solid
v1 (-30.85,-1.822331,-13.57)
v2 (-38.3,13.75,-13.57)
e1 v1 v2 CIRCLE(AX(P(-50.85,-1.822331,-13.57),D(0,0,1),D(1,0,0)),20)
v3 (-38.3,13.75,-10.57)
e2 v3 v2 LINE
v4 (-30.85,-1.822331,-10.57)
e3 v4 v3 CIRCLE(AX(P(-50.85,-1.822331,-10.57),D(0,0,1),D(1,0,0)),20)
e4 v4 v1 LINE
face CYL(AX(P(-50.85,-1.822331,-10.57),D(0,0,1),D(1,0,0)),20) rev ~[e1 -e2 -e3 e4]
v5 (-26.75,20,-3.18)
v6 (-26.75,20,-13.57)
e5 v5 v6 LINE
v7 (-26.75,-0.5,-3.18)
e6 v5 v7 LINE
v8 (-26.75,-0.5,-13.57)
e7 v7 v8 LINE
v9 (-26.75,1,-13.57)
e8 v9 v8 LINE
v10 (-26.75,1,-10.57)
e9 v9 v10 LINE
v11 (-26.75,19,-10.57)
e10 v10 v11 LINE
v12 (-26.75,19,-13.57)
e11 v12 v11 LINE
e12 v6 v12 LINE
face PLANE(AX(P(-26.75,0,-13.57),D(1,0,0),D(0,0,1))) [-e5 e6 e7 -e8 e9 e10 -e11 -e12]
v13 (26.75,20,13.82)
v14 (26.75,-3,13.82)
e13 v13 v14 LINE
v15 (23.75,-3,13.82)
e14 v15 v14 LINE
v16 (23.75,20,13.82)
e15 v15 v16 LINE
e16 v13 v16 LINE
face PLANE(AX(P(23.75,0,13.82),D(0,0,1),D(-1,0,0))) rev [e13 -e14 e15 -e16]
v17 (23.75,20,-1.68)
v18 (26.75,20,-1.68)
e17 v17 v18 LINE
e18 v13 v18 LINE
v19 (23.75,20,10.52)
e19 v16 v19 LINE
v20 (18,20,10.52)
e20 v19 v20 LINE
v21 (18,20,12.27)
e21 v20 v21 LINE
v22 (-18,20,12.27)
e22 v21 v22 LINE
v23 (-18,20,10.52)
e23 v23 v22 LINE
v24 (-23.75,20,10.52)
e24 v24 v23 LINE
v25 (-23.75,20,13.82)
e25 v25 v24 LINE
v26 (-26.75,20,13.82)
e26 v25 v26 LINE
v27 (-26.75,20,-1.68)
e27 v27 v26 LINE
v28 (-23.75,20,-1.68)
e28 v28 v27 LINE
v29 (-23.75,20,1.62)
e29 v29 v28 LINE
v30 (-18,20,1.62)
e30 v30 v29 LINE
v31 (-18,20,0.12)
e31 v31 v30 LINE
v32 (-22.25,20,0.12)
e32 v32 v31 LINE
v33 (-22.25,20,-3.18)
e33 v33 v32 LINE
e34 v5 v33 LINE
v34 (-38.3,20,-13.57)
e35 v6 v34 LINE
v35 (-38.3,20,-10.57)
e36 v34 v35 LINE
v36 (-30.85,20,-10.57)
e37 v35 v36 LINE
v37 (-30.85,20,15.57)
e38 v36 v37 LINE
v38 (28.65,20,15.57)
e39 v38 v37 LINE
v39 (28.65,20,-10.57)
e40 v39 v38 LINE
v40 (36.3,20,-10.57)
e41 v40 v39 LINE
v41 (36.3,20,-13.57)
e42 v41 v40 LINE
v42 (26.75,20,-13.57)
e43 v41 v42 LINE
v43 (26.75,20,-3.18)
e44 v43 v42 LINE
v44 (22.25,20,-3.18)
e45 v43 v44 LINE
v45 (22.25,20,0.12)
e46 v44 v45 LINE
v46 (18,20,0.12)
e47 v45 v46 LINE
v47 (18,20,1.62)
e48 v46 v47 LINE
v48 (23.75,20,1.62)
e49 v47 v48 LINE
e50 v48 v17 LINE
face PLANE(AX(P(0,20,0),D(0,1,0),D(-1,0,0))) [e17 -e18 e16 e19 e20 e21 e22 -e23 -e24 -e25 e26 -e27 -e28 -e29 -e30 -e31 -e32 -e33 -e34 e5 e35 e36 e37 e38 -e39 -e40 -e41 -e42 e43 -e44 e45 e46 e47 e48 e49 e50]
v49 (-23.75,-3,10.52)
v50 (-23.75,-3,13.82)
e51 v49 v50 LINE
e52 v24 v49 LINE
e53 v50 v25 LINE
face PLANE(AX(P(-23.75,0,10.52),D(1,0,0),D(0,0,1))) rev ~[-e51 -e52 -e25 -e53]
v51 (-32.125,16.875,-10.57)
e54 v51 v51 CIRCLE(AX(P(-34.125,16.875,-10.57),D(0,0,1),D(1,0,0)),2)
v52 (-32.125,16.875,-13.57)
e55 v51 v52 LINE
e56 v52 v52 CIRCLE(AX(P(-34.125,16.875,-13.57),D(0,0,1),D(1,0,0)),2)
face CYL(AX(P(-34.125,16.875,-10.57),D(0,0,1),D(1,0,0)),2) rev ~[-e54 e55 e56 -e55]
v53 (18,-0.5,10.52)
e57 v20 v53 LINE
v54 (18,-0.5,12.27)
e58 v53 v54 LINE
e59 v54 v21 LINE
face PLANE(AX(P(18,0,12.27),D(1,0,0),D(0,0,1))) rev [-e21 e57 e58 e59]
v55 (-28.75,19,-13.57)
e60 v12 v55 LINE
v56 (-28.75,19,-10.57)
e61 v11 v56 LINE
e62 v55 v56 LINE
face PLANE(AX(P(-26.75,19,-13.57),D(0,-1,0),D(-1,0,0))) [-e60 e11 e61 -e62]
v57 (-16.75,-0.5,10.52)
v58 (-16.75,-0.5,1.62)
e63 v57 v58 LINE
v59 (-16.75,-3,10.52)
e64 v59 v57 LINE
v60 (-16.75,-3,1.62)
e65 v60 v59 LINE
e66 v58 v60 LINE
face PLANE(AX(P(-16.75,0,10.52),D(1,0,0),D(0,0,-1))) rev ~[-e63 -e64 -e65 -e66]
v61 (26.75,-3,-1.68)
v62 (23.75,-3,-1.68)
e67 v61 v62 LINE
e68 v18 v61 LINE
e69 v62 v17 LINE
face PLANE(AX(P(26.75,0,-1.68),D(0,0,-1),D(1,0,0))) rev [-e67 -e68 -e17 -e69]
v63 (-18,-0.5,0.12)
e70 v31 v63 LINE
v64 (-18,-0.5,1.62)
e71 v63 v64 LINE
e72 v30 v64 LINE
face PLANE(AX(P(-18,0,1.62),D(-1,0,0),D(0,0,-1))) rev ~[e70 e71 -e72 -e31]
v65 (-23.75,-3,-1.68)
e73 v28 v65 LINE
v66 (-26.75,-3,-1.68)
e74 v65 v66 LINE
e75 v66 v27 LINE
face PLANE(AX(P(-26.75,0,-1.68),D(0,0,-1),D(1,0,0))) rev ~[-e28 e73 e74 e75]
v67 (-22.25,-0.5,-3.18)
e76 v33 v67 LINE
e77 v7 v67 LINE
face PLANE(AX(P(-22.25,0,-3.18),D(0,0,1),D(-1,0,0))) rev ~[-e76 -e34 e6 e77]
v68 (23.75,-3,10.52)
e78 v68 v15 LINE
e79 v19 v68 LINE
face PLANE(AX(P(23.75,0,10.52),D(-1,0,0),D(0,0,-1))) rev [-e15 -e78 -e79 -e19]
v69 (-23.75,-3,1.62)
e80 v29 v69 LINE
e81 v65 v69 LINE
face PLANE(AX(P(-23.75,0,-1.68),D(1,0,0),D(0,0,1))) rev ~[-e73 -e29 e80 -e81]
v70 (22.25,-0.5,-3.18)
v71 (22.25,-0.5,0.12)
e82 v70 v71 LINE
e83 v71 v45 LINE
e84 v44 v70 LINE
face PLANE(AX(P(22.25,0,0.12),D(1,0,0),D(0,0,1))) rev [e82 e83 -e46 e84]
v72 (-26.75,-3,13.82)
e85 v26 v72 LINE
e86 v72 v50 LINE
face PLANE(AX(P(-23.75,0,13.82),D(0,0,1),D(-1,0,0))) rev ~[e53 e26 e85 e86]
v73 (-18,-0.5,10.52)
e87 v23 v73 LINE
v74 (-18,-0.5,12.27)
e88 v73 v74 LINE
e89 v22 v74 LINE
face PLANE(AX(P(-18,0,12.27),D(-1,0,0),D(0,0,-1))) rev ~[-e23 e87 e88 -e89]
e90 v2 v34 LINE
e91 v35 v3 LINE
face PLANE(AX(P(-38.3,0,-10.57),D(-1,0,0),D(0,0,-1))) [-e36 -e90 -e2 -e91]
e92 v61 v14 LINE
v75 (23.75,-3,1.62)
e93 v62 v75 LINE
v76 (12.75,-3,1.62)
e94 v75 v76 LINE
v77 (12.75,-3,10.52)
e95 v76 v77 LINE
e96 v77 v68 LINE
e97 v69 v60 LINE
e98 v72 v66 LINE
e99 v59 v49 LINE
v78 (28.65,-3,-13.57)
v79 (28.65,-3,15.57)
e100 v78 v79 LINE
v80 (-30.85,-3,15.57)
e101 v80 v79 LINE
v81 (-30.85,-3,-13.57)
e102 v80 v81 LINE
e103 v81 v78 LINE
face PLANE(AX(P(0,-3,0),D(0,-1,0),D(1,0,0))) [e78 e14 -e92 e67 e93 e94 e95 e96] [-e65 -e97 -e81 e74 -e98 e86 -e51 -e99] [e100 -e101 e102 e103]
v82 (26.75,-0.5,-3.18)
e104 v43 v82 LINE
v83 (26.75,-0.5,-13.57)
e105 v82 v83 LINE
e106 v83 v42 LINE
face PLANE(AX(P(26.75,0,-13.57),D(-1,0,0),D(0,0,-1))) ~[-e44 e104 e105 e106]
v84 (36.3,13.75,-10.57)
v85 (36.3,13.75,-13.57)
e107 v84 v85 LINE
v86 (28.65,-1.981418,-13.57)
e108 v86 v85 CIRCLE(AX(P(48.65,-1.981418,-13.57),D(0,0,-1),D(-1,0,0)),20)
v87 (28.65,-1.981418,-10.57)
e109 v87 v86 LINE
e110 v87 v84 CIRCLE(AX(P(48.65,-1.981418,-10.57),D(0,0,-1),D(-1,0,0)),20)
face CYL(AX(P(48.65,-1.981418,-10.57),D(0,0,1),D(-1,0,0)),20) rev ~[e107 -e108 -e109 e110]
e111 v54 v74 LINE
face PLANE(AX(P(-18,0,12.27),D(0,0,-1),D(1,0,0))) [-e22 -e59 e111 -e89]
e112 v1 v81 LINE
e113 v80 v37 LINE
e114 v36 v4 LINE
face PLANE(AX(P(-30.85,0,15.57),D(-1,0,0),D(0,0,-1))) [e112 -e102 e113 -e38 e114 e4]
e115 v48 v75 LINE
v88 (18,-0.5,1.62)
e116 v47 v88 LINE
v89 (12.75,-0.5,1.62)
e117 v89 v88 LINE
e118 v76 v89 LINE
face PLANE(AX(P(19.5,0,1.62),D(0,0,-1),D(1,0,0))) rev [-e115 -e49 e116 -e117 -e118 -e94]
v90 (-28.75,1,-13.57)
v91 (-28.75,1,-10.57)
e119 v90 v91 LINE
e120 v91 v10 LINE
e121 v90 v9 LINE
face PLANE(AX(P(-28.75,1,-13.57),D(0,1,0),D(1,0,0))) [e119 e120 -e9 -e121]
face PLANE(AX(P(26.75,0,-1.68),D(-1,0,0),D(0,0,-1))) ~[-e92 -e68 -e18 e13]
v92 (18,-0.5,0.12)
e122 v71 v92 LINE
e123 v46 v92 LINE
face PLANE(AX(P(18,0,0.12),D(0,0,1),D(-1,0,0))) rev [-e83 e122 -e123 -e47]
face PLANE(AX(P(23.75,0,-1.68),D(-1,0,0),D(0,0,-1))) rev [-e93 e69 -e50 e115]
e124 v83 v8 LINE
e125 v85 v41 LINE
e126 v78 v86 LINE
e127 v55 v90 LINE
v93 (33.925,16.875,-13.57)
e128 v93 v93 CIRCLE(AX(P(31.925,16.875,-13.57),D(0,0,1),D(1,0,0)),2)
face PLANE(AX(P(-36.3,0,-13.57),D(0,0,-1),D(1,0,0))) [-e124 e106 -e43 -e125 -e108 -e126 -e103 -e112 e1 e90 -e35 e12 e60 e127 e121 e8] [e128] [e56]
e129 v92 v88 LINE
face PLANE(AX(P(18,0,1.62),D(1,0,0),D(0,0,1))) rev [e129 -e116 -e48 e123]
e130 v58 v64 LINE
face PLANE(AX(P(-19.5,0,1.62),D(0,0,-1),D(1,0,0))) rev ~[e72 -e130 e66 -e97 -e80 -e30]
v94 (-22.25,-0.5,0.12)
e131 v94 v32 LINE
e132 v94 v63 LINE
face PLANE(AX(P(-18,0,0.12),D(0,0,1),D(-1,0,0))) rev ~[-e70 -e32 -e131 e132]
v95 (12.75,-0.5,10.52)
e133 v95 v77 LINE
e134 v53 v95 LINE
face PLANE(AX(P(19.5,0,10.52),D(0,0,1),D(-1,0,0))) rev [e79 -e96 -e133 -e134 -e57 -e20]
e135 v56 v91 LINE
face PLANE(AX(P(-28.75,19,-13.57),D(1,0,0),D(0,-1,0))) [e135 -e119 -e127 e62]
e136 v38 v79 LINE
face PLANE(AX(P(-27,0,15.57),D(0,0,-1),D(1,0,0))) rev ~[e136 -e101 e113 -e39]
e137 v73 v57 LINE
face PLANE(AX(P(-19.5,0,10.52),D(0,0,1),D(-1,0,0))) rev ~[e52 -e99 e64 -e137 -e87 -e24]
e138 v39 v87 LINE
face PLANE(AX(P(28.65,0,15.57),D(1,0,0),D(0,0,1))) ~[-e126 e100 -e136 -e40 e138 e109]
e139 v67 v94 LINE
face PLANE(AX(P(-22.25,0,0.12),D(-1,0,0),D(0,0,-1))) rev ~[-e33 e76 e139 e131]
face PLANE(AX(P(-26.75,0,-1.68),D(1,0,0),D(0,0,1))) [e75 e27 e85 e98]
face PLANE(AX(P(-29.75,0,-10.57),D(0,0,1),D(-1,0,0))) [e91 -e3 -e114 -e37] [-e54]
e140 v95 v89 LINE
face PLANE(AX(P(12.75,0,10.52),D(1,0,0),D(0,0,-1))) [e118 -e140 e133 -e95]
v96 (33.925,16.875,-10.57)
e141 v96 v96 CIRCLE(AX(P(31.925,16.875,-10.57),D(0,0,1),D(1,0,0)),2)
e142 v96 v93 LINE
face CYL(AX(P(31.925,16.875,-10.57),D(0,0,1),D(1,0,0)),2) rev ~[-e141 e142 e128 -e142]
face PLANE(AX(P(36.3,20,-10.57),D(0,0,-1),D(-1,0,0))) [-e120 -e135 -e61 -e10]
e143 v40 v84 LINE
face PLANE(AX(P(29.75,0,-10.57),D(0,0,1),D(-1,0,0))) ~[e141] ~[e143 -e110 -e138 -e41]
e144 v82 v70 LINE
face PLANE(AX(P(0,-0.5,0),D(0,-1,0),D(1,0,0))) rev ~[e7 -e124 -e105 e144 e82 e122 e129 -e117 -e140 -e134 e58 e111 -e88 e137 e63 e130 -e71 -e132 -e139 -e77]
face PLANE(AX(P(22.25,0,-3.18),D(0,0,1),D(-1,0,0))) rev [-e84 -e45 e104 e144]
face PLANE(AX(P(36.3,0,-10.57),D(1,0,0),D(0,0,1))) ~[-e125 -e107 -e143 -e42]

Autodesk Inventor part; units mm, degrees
ref_plane "YZ Plane" through (0, 0, 0) normal (1, 0, 0) x (0, 1, 0)
ref_plane "XZ Plane" through (0, 0, 0) normal (0, 1, 0) x (-1, 0, 0)
ref_plane "XY Plane" through (0, 0, 0) normal (0, 0, 1) x (1, 0, 0)
sketch "Boceto1" plane through (0, 0, 0) normal (0, 1, 0) x (-1, 0, 0)
  line L0 (24, 13.57) -> (26.5, 13.57)
  line L1 (-26.5, 13.57) -> (26.5, -13.57) construction
  line L2 (26.5, 13.57) -> (-26.5, -13.57) construction
  line L3 (24, 13.57) -> (24, 10.27) construction
  line L4 (24, 10.27) -> (20, 10.27) construction
  line L5 (20, 10.27) -> (20, 1.87) construction
  line L6 (20, 1.87) -> (24, 1.87) construction
  line L7 (24, 1.87) -> (24, -1.43) construction
  line L8 (24, -1.43) -> (26.5, -1.43) construction
  line L9 (26.75, -1.68) -> (23.75, -1.68)
  line L10 (23.75, -1.68) -> (23.75, 1.62)
  line L11 (23.75, 1.62) -> (19.5, 1.62)
  line L12 (19.5, 10.52) -> (23.75, 10.52)
  line L13 (23.75, 10.52) -> (23.75, 13.82)
  line L14 (27, 15.57) -> (0, 15.57)
  line L15 (18, 0.12) -> (22.25, 0.12)
  line L16 (22.25, 0.12) -> (22.25, -3.18)
  line L17 (22.25, -3.18) -> (26.75, -3.18)
  line L18 (18, 12.27) -> (0, 12.27)
  line L19 (19.5, 10.52) -> (18, 10.52)
  line L20 (19.5, 1.62) -> (18, 1.62)
  line L21 (27, 15.57) -> (29.75, 15.57)
  line L22 (29.75, 15.57) -> (29.75, -10.57)
  line L23 (29.75, -10.57) -> (36.3, -10.57)
  line L24 (36.3, -10.57) -> (36.3, -13.57)
  line L25 (36.3, -13.57) -> (26.75, -13.57)
  line L26 (0, 12.27) -> (0, 15.57)
  line L27 (23.75, 13.82) -> (26.75, 13.82)
  line L28 (18, 12.27) -> (18, 10.52)
  line L29 (18, 1.62) -> (18, 0.12)
  line L30 (26.75, -13.57) -> (26.75, -3.18)
  line L31 (26.75, -1.68) -> (26.75, 13.82)
  line L32 (26.5, 13.57) -> (26.5, -1.68) construction
  point P0 (0, 0)
  point P1 (23.75, 13.57)
  point P2 (0, 13.57)
  point P3 (27, -12.07)
  dimension "d1" = 27.14
  dimension "d2" = 15
  dimension "d4" = 3.3
  dimension "d5" = 4
  dimension "d6" = 3.3
  dimension "d10" = 0.25
  dimension "d11" = 0.25
  dimension "d12" = 1.5
  dimension "d16" = 3
  dimension "d17" = 29.14
  dimension "d23" = 18
  dimension "d24" = 2
  dimension "d25" = 0.25
  dimension "d27" = 15.57
  dimension "d28" = 29.75
  dimension "d29" = 3.3
  dimension "d30" = 0.25
  dimension "d31" = 20
  dimension "d32" = 6.5
  dimension "d33" = 0.25
  dimension "d34" = 4.25
  dimension "d36" = 0.25
  dimension "d51" = 36.3
extrude "Extrusión1" add sketch "Boceto1" along normal blind 20
mirror "Simetría1" about plane through (0, 0, 0) normal (1, 0, 0) of "Extrusión1"
sketch "Boceto2" plane through (0, 0, 0) normal (0, -1, 0) x (1, 0, 0)
  line L0 (18, 1.62) -> (18, 0.12) projected
  line L1 (18, 1.62) -> (-18, 1.62)
  line L2 (-18, 1.62) -> (-18, 0.12) projected
  line L3 (-18, 0.12) -> (-22.25, 0.12) projected
  line L4 (-22.25, 0.12) -> (-22.25, -3.18) projected
  line L5 (-22.25, -3.18) -> (-26.75, -3.18) projected
  line L6 (-26.75, -3.18) -> (-26.75, -13.57) projected
  line L7 (26.75, -3.18) -> (26.75, -13.57) projected
  line L8 (22.25, -3.18) -> (26.75, -3.18) projected
  line L9 (22.25, 0.12) -> (22.25, -3.18) projected
  line L10 (18, 0.12) -> (22.25, 0.12) projected
  line L11 (26.75, -13.57) -> (36.3, -13.57) projected
  line L12 (36.3, -13.57) -> (36.3, -10.57) projected
  line L13 (-36.3, -10.57) -> (-29.75, -10.57) projected
  line L14 (-36.3, -13.57) -> (-36.3, -10.57) projected
  line L15 (-26.75, -13.57) -> (-36.3, -13.57) projected
  line L16 (23.75, 1.62) -> (18, 1.62) projected
  line L17 (23.75, -1.68) -> (23.75, 1.62) projected
  line L18 (26.75, -1.68) -> (23.75, -1.68) projected
  line L19 (36.3, -10.57) -> (29.75, -10.57) projected
  line L20 (26.75, -1.68) -> (29.75, -1.68)
  line L21 (29.75, -10.57) -> (29.75, 15.57) projected
  line L22 (-23.75, 1.62) -> (-18, 1.62) projected
  line L23 (-23.75, -1.68) -> (-23.75, 1.62) projected
  line L24 (-26.75, -1.68) -> (-23.75, -1.68) projected
  line L25 (-26.75, 13.82) -> (-26.75, -1.68) projected
  line L26 (-26.75, -1.68) -> (-29.75, -1.68)
  line L27 (-29.75, -10.57) -> (-29.75, 15.57) projected
  line L28 (26.75, -13.57) -> (-26.75, -13.57)
  line L29 (-18, 12.27) -> (18, 12.27) projected
  line L30 (12.75, 12.27) -> (12.75, 1.62)
  line L31 (26.75, 13.82) -> (26.75, -1.68) projected
  line L32 (-29.75, 15.57) -> (29.75, 15.57) projected
  line L33 (-16.75, 12.27) -> (-16.75, 1.62)
  line L34 (23.75, 13.82) -> (26.75, 13.82) projected
  line L35 (18, 10.52) -> (23.75, 10.52) projected
  line L36 (23.75, 10.52) -> (23.75, 13.82) projected
  line L37 (18, 12.27) -> (18, 10.52) projected
  line L38 (-23.75, 10.52) -> (-23.75, 13.82) projected
  line L39 (-18, 10.52) -> (-23.75, 10.52) projected
  line L40 (-18, 12.27) -> (-18, 10.52) projected
  line L41 (-18, 12.27) -> (18, 12.27) projected
  line L42 (18, 12.27) -> (18, 10.52) projected
  line L43 (18, 10.52) -> (23.75, 10.52) projected
  line L44 (23.75, 10.52) -> (23.75, 13.82) projected
  line L45 (23.75, 13.82) -> (26.75, 13.82) projected
  line L46 (26.75, 13.82) -> (26.75, -1.68) projected
  line L47 (26.75, -1.68) -> (23.75, -1.68) projected
  line L48 (23.75, -1.68) -> (23.75, 1.62) projected
  line L49 (23.75, 1.62) -> (18, 1.62) projected
  line L50 (18, 1.62) -> (18, 0.12) projected
  line L51 (18, 0.12) -> (22.25, 0.12) projected
  line L52 (22.25, 0.12) -> (22.25, -3.18) projected
  line L53 (22.25, -3.18) -> (26.75, -3.18) projected
  line L54 (26.75, -3.18) -> (26.75, -13.57) projected
  line L55 (26.75, -13.57) -> (36.3, -13.57) projected
  line L56 (36.3, -13.57) -> (36.3, -10.57) projected
  line L57 (36.3, -10.57) -> (29.75, -10.57) projected
  line L58 (29.75, -10.57) -> (29.75, 15.57) projected
  line L59 (-29.75, 15.57) -> (29.75, 15.57) projected
  line L60 (-29.75, -10.57) -> (-29.75, 15.57) projected
  line L61 (-36.3, -10.57) -> (-29.75, -10.57) projected
  line L62 (-36.3, -13.57) -> (-36.3, -10.57) projected
  line L63 (-26.75, -13.57) -> (-36.3, -13.57) projected
  line L64 (-26.75, -3.18) -> (-26.75, -13.57) projected
  line L65 (-22.25, -3.18) -> (-26.75, -3.18) projected
  line L66 (-22.25, 0.12) -> (-22.25, -3.18) projected
  line L67 (-18, 0.12) -> (-22.25, 0.12) projected
  line L68 (-18, 1.62) -> (-18, 0.12) projected
  line L69 (-23.75, 1.62) -> (-18, 1.62) projected
  line L70 (-23.75, -1.68) -> (-23.75, 1.62) projected
  line L71 (-26.75, -1.68) -> (-23.75, -1.68) projected
  line L72 (-26.75, 13.82) -> (-26.75, -1.68) projected
  line L73 (-23.75, 13.82) -> (-26.75, 13.82) projected
  line L74 (18, 10.52) -> (12.75, 10.52)
  line L75 (-18, 10.52) -> (-16.75, 10.52)
  point P0 (0, 0)
  point P1 (0, 1.62)
  point P2 (12.75, 12.27)
  dimension "d42" = 14
  dimension "d43" = 10
extrude "Extrusión2" add sketch "Boceto2" along normal blind 3 contours L16 L17 L18 L20 L21 L19 L12 L11 L7 L8 L9 L10 L0 | L0 L10 L9 L8 L7 L28 L6 L5 L4 L3 L2 L1 | L1 L33 L29 L30 | L30 L29 L37 L74 | L2 L3 L4 L5 L6 L15 L14 L13 L27 L26 L24 L23 L22 | L75 L40 L29 L33 | L29 L40 L39 L38 L73 L25 L26 L27 L32 L21 L20 L31 L34 L36 L35 L37
move faces "Desplazar2" translate (0, -0.5, 0) faces at (4.25, 0, -8.5067)
move faces "Desplazar3" translate (-1.1, 0, 0) faces at (-29.75, 12.3333, 6.8567)
move faces "Desplazar4" translate (-1.1, 0, 0) faces at (29.75, 12.3333, 6.8567)
move faces "Desplazar5" translate (-2, 0, 0) faces at (-36.3, 12.3333, -11.57)
sketch "Boceto5" plane through (-36.3, -3, -10.57) normal (0, 0, 1) x (1, 0, 0)
  line L0 (0, 0) -> (72.6, 0) projected
  line L1 (5.45, 0) -> (5.45, 23) projected
  line L2 (0, 0) -> (5.45, 0)
  line L3 (5.45, 0) -> (5.45, 16.75)
  line L4 (5.45, 16.75) -> (-2, 16.75)
  line L5 (-2, 16.75) -> (-2, 0)
  line L6 (64.95, 23) -> (64.95, 0) projected
  line L7 (64.95, 0) -> (72.6, 0)
  line L8 (72.6, 0) -> (72.6, 16.75)
  line L9 (72.6, 16.75) -> (64.95, 16.75)
  line L10 (64.95, 16.75) -> (64.95, 0)
  line L11 (72.6, 23) -> (64.95, 23) projected
  line L12 (5.45, 0) -> (-2, 0) projected
  point P0 (36.3, 3)
  dimension "d63" = 6.25
extrude "Extrusión5" cut sketch "Boceto5" against normal blind 10
fillet "Empalme2" radius 20 2 edges at (28.65, 13.75, -12.07) (-30.85, 13.75, -12.07)
sketch "Boceto7" plane through (36.3, 20, -13.57) normal (0, 0, -1) x (-1, 0, 0)
  line L0 (65.05, -19) -> (63.05, -19)
  line L1 (63.05, -19) -> (63.05, -1)
  line L2 (63.05, -1) -> (65.05, -1)
  line L3 (65.05, -1) -> (65.05, -19)
  line L4 (63.05, -20.5) -> (9.55, -20.5) projected
  line L5 (63.05, -20.5) -> (63.05, 0) projected
  point P0 (36.3, -20)
  dimension "d75" = 2
  dimension "d76" = 18
  dimension "d77" = 1.5
extrude "Extrusión7" cut sketch "Boceto7" against normal blind 3
sketch "Boceto8" plane through (-38.3, 20, -10.57) normal (0, 0, 1) x (1, 0, 0)
  circle A0 centre (4.175, -3.125) radius 2 projected
  circle A1 centre (70.225, -3.125) radius 2 projected
  circle A2 centre (4.175, -3.125) radius 3
  circle A3 centre (70.225, -3.125) radius 3
  point P0 (38.3, -20)
  dimension "d80" = 6
  dimension "d81" = 6
extrude "Extrusión8" cut sketch "Boceto8" against normal through all contours A0 | A1
equation "\"d6\" = d4"
equation "\"d9\" = d7"
equation "\"d7\" = 0.5"
properties part number "Guía" material "Plástico PC/ABS"
